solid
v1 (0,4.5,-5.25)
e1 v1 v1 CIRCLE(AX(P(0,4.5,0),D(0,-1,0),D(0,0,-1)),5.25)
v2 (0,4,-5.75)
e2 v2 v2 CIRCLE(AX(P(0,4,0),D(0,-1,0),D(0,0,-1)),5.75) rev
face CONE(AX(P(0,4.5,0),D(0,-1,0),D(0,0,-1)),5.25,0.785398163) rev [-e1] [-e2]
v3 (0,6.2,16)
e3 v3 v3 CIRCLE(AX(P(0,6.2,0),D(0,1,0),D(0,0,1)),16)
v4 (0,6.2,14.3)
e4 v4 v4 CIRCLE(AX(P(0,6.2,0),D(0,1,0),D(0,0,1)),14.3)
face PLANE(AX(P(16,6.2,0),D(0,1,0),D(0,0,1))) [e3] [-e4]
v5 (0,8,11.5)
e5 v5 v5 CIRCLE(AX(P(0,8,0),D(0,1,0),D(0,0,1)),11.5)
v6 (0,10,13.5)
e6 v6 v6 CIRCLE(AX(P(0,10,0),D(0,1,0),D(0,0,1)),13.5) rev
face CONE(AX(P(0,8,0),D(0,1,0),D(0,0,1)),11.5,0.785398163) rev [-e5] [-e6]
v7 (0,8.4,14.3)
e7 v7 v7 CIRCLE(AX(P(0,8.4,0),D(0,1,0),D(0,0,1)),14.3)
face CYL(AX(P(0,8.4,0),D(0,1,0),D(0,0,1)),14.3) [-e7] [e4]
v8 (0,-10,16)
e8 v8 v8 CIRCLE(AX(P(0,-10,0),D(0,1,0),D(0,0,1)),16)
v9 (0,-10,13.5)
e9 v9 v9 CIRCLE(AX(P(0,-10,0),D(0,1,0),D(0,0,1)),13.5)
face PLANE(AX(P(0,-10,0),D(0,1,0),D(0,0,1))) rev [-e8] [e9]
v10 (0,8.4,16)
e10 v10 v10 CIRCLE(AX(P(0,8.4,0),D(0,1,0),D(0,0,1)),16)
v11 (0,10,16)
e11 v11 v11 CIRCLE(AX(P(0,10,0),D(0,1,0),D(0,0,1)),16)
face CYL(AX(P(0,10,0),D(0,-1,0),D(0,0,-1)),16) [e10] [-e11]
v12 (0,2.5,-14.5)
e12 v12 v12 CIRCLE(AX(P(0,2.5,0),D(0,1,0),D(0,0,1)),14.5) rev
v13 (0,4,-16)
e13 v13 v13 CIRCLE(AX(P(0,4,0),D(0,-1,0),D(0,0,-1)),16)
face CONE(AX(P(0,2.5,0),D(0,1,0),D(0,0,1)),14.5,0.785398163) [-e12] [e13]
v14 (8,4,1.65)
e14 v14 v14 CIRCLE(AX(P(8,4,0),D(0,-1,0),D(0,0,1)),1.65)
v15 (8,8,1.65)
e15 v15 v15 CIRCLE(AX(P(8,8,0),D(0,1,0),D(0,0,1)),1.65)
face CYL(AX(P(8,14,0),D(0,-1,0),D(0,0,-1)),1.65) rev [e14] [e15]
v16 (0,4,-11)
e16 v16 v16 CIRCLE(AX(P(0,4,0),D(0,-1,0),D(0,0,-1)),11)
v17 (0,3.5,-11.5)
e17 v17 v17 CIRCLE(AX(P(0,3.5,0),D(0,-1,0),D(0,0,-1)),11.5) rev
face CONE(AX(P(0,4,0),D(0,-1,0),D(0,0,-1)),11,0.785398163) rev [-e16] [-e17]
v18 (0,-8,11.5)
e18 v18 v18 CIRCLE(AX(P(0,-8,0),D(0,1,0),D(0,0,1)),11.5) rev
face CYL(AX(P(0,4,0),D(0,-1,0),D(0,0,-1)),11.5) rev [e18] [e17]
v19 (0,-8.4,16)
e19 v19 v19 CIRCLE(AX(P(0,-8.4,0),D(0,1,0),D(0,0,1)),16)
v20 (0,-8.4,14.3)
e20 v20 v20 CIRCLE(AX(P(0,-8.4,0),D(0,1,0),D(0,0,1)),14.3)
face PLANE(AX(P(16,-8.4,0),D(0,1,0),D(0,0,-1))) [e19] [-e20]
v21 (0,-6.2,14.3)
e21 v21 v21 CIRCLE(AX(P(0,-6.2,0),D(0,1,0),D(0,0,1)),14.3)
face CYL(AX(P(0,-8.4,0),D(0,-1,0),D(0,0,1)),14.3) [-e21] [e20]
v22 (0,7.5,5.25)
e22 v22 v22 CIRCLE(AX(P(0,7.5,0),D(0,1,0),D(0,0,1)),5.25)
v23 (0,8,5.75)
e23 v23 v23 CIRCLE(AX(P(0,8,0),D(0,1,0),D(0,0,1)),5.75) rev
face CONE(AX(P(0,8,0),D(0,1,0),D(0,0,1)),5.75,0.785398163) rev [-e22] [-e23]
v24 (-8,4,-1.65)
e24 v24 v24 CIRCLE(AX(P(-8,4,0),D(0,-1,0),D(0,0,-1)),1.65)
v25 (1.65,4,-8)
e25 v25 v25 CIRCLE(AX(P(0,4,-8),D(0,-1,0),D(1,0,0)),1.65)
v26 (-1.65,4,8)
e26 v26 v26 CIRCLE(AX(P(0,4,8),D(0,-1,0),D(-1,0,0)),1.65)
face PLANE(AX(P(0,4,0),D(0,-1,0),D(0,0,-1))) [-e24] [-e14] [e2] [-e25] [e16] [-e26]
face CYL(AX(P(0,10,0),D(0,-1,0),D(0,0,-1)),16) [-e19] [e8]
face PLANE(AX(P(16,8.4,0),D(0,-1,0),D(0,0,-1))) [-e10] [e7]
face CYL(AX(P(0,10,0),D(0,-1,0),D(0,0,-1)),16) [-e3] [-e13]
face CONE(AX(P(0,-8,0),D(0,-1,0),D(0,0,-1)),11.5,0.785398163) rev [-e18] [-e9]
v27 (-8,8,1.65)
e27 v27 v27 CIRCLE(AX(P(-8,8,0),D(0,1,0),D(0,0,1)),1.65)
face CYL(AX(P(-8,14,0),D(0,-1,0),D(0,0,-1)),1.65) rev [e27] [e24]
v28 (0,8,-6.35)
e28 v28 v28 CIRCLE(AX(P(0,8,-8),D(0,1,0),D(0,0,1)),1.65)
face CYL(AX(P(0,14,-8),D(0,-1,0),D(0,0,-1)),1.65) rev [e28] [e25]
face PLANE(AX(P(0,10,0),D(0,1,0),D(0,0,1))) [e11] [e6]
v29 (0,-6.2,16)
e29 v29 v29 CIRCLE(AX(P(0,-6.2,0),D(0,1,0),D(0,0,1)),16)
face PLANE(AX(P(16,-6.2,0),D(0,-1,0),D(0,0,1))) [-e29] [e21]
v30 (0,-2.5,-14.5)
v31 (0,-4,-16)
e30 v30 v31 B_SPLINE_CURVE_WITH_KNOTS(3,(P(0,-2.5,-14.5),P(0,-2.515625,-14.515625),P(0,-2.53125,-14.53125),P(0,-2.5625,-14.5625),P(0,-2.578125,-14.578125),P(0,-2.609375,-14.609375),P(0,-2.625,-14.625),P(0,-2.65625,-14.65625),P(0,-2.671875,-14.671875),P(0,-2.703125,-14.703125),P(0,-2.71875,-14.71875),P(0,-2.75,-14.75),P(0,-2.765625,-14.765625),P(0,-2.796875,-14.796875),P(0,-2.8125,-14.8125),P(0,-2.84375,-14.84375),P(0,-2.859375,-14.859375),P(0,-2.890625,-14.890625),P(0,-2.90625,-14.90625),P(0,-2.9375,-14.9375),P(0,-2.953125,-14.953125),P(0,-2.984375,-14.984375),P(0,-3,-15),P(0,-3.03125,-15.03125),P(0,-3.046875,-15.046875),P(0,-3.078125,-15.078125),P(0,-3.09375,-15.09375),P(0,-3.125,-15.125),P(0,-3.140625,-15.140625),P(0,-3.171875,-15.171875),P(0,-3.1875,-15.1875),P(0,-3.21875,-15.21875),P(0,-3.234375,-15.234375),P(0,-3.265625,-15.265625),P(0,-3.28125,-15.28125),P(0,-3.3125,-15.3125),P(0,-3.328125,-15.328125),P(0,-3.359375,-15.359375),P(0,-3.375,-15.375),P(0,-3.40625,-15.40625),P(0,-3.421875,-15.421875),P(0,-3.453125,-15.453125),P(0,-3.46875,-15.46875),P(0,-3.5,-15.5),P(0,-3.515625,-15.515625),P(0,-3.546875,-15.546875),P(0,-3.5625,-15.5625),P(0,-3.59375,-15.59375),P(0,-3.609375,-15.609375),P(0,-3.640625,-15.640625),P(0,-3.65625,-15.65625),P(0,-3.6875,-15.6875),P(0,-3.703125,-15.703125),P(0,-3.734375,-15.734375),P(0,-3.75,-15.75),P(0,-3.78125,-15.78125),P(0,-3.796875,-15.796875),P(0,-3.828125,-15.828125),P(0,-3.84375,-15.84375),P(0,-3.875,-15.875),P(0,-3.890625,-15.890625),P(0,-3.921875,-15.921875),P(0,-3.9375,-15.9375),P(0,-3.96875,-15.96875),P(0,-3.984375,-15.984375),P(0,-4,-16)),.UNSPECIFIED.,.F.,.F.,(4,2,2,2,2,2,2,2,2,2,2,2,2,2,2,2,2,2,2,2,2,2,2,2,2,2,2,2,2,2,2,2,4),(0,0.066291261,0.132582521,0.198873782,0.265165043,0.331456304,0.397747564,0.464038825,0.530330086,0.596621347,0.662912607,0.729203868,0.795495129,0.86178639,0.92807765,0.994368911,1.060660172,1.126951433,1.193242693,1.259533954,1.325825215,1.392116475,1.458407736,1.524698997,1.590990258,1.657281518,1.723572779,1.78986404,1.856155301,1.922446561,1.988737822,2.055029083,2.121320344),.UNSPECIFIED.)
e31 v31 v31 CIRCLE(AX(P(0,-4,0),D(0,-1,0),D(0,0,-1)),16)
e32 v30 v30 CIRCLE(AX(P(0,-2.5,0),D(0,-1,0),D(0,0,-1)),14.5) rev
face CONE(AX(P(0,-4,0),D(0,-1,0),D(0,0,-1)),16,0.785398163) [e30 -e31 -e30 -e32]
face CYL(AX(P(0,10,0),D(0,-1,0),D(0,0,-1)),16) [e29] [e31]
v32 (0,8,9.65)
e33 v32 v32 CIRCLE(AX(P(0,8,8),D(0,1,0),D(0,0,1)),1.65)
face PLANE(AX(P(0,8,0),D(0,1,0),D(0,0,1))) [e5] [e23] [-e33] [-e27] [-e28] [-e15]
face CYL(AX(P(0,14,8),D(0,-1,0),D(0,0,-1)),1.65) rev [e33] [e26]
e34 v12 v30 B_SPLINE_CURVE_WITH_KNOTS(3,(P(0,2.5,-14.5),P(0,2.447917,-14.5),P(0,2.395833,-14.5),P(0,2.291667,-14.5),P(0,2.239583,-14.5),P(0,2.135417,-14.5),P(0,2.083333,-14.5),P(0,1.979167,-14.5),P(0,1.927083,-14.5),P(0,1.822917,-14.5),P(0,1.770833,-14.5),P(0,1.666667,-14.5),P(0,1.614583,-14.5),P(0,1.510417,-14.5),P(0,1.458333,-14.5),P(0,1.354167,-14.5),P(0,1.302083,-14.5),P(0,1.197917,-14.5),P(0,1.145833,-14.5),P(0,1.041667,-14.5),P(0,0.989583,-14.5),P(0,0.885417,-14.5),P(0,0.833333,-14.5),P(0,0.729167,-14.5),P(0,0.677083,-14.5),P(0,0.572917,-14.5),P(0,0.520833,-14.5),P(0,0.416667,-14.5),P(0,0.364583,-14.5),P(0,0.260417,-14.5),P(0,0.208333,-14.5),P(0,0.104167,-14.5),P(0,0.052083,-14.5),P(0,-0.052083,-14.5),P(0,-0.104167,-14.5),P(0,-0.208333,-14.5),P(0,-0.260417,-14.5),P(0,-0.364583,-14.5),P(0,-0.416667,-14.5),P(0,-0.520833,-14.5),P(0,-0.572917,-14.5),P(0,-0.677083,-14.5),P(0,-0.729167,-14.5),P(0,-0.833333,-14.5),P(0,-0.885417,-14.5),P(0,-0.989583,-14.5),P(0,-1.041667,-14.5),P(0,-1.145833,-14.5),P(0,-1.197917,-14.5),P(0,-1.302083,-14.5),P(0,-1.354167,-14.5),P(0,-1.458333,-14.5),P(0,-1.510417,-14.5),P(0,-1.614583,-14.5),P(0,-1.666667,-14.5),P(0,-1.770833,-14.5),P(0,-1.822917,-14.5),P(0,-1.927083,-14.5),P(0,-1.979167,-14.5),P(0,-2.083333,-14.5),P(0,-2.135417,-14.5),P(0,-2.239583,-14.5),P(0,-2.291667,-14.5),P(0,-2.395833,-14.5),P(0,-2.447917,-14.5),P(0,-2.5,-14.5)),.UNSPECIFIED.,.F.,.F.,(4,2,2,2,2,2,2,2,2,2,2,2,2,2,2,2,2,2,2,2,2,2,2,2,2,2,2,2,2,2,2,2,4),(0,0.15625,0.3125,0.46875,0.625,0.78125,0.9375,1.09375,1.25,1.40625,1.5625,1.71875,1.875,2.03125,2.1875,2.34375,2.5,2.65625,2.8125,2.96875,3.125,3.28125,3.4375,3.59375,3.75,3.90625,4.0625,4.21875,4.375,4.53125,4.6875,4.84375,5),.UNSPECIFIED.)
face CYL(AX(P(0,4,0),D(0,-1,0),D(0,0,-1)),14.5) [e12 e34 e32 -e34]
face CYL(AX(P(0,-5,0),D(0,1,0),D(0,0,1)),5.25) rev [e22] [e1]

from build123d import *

# Parameters (mm, degrees)
SKETCH_1_R               = 16
EXTRUDE_1_DEPTH          = 10
SKETCH_2_W               = 1.7
SKETCH_2_H               = 2.2
SKETCH_4_R               = 11.5
CUT_EXTRUDE_1_DEPTH      = 14
SKETCH_5_R               = 5.25
CUT_EXTRUDE_2_DEPTH      = 15
CHAMFER_1_SIZE           = 2
CUT_EXTRUDE_START        = -2
SKETCH_6_R               = 11.5
SKETCH_6_R_2             = 5
CUT_EXTRUDE_3_DEPTH      = 2
CHAMFER_2_SIZE           = 2
SKETCH_8_R               = 1.65
CUT_EXTRUDE_4_DEPTH      = 10
PATTERN_CIRCULAR_1_COUNT = 4
SKETCH_7_W               = 1.5
SKETCH_7_H               = 8
CHAMFER_5_SIZE           = 1.5
CHAMFER_4_SIZE           = 0.5


with BuildPart() as part:
    # 草图1 → 凸台-拉伸1 (new, symmetric)
    with BuildSketch(Plane(origin=(0, 0, 0), x_dir=(1, 0, 0), z_dir=(0, 1, 0))):
        with Locations(Location((0, 0, 0), (0, 0, 270))):
            Circle(SKETCH_1_R)
    extrude(amount=EXTRUDE_1_DEPTH, both=True)

    # 草图2 → 切除-旋转1 (revolve, cut)
    with BuildSketch(Plane.XY, mode=Mode.PRIVATE) as cut_revolve_1_sk:
        with Locations((15.15, 7.3)):
            Rectangle(SKETCH_2_W, SKETCH_2_H)
    cut_revolve_1 = revolve(cut_revolve_1_sk.sketch.rotate(Axis((0, 8.4, 0), (0, -1, 0)), 90), axis=Axis((0, 8.4, 0), (0, -1, 0)), mode=Mode.SUBTRACT)

    # 镜向1: 切除-旋转1 across plane
    add(cut_revolve_1.mirror(Plane.ZX), mode=Mode.SUBTRACT)

    # 草图4 → 切除-拉伸1 (cut)
    with BuildSketch(Plane.XZ.offset(10)):
        with Locations(Location((0, 0, 0), (0, 0, 270))):
            Circle(SKETCH_4_R)
    extrude(amount=-CUT_EXTRUDE_1_DEPTH, mode=Mode.SUBTRACT)

    # 草图5 → 切除-拉伸2 (cut)
    with BuildSketch(Plane(origin=(0, 10, 0), x_dir=(1, 0, 0), z_dir=(0, 1, 0))):
        with Locations(Location((0, 0, 0), (0, 0, 270))):
            Circle(SKETCH_5_R)
    extrude(amount=-CUT_EXTRUDE_2_DEPTH, mode=Mode.SUBTRACT)

    # 倒角1
    chamfer_1_edges = [part.edges().sort_by_distance(p)[0] for p in [
        (0, -10, 11.5),
    ]]
    chamfer(chamfer_1_edges, length=CHAMFER_1_SIZE)

    # 草图6 → 切除-拉伸3 (cut)
    with BuildSketch(Plane(origin=(0, 10, 0), x_dir=(1, 0, 0), z_dir=(0, 1, 0)).offset(CUT_EXTRUDE_START)):
        with Locations(Location((0, 0, 0), (0, 0, 90))):
            Circle(SKETCH_6_R)
        Circle(SKETCH_6_R_2, mode=Mode.SUBTRACT)
    extrude(amount=CUT_EXTRUDE_3_DEPTH, mode=Mode.SUBTRACT)

    # 倒角2
    chamfer_2_edges = [part.edges().sort_by_distance(p)[0] for p in [
        (0, 10, 11.5),
    ]]
    chamfer(chamfer_2_edges, length=CHAMFER_2_SIZE - 0.0001)  # a hair under: the kernel refuses the full size

    # 草图8 → 切除-拉伸4 (cut)
    with BuildSketch(Plane.XZ.offset(-4)):
        with Locations(Location((-8, 0, 0), (0, 0, 270))):
            Circle(SKETCH_8_R)
    cut_extrude_4 = extrude(amount=-CUT_EXTRUDE_4_DEPTH, mode=Mode.SUBTRACT)

    # 阵列(圆周)1: 切除-拉伸4 ×4 about axis
    pattern_circular_1_axis = Axis((0, 0, 0), (0, 1, 0))
    for i in range(1, PATTERN_CIRCULAR_1_COUNT):
        add(cut_extrude_4.rotate(pattern_circular_1_axis, i * 360 / PATTERN_CIRCULAR_1_COUNT), mode=Mode.SUBTRACT)

    # 草图7 → 切除-旋转2 (revolve, cut)
    with BuildSketch(Plane(origin=(0, 0, 0), x_dir=(0, 0, -1), z_dir=(1, 0, 0))):
        with Locations((15.25, 0)):
            Rectangle(SKETCH_7_W, SKETCH_7_H)
    revolve(axis=Axis((0, 4, 0), (0, 1, 0)), mode=Mode.SUBTRACT)

    # 倒角5
    chamfer_5_edges = [part.edges().sort_by_distance(p)[0] for p in [
        (0, -4, 14.5),
        (0, 4, 14.5),
    ]]
    chamfer(chamfer_5_edges, length=CHAMFER_5_SIZE - 0.0001)  # a hair under: the kernel refuses the full size

    # 倒角4
    chamfer_4_edges = [part.edges().sort_by_distance(p)[0] for p in [
        (0, 4, 11.5),
        (0, 4, -5.25),
        (0, 8, -5.25),
    ]]
    chamfer(chamfer_4_edges, length=CHAMFER_4_SIZE)


solid = part.part
